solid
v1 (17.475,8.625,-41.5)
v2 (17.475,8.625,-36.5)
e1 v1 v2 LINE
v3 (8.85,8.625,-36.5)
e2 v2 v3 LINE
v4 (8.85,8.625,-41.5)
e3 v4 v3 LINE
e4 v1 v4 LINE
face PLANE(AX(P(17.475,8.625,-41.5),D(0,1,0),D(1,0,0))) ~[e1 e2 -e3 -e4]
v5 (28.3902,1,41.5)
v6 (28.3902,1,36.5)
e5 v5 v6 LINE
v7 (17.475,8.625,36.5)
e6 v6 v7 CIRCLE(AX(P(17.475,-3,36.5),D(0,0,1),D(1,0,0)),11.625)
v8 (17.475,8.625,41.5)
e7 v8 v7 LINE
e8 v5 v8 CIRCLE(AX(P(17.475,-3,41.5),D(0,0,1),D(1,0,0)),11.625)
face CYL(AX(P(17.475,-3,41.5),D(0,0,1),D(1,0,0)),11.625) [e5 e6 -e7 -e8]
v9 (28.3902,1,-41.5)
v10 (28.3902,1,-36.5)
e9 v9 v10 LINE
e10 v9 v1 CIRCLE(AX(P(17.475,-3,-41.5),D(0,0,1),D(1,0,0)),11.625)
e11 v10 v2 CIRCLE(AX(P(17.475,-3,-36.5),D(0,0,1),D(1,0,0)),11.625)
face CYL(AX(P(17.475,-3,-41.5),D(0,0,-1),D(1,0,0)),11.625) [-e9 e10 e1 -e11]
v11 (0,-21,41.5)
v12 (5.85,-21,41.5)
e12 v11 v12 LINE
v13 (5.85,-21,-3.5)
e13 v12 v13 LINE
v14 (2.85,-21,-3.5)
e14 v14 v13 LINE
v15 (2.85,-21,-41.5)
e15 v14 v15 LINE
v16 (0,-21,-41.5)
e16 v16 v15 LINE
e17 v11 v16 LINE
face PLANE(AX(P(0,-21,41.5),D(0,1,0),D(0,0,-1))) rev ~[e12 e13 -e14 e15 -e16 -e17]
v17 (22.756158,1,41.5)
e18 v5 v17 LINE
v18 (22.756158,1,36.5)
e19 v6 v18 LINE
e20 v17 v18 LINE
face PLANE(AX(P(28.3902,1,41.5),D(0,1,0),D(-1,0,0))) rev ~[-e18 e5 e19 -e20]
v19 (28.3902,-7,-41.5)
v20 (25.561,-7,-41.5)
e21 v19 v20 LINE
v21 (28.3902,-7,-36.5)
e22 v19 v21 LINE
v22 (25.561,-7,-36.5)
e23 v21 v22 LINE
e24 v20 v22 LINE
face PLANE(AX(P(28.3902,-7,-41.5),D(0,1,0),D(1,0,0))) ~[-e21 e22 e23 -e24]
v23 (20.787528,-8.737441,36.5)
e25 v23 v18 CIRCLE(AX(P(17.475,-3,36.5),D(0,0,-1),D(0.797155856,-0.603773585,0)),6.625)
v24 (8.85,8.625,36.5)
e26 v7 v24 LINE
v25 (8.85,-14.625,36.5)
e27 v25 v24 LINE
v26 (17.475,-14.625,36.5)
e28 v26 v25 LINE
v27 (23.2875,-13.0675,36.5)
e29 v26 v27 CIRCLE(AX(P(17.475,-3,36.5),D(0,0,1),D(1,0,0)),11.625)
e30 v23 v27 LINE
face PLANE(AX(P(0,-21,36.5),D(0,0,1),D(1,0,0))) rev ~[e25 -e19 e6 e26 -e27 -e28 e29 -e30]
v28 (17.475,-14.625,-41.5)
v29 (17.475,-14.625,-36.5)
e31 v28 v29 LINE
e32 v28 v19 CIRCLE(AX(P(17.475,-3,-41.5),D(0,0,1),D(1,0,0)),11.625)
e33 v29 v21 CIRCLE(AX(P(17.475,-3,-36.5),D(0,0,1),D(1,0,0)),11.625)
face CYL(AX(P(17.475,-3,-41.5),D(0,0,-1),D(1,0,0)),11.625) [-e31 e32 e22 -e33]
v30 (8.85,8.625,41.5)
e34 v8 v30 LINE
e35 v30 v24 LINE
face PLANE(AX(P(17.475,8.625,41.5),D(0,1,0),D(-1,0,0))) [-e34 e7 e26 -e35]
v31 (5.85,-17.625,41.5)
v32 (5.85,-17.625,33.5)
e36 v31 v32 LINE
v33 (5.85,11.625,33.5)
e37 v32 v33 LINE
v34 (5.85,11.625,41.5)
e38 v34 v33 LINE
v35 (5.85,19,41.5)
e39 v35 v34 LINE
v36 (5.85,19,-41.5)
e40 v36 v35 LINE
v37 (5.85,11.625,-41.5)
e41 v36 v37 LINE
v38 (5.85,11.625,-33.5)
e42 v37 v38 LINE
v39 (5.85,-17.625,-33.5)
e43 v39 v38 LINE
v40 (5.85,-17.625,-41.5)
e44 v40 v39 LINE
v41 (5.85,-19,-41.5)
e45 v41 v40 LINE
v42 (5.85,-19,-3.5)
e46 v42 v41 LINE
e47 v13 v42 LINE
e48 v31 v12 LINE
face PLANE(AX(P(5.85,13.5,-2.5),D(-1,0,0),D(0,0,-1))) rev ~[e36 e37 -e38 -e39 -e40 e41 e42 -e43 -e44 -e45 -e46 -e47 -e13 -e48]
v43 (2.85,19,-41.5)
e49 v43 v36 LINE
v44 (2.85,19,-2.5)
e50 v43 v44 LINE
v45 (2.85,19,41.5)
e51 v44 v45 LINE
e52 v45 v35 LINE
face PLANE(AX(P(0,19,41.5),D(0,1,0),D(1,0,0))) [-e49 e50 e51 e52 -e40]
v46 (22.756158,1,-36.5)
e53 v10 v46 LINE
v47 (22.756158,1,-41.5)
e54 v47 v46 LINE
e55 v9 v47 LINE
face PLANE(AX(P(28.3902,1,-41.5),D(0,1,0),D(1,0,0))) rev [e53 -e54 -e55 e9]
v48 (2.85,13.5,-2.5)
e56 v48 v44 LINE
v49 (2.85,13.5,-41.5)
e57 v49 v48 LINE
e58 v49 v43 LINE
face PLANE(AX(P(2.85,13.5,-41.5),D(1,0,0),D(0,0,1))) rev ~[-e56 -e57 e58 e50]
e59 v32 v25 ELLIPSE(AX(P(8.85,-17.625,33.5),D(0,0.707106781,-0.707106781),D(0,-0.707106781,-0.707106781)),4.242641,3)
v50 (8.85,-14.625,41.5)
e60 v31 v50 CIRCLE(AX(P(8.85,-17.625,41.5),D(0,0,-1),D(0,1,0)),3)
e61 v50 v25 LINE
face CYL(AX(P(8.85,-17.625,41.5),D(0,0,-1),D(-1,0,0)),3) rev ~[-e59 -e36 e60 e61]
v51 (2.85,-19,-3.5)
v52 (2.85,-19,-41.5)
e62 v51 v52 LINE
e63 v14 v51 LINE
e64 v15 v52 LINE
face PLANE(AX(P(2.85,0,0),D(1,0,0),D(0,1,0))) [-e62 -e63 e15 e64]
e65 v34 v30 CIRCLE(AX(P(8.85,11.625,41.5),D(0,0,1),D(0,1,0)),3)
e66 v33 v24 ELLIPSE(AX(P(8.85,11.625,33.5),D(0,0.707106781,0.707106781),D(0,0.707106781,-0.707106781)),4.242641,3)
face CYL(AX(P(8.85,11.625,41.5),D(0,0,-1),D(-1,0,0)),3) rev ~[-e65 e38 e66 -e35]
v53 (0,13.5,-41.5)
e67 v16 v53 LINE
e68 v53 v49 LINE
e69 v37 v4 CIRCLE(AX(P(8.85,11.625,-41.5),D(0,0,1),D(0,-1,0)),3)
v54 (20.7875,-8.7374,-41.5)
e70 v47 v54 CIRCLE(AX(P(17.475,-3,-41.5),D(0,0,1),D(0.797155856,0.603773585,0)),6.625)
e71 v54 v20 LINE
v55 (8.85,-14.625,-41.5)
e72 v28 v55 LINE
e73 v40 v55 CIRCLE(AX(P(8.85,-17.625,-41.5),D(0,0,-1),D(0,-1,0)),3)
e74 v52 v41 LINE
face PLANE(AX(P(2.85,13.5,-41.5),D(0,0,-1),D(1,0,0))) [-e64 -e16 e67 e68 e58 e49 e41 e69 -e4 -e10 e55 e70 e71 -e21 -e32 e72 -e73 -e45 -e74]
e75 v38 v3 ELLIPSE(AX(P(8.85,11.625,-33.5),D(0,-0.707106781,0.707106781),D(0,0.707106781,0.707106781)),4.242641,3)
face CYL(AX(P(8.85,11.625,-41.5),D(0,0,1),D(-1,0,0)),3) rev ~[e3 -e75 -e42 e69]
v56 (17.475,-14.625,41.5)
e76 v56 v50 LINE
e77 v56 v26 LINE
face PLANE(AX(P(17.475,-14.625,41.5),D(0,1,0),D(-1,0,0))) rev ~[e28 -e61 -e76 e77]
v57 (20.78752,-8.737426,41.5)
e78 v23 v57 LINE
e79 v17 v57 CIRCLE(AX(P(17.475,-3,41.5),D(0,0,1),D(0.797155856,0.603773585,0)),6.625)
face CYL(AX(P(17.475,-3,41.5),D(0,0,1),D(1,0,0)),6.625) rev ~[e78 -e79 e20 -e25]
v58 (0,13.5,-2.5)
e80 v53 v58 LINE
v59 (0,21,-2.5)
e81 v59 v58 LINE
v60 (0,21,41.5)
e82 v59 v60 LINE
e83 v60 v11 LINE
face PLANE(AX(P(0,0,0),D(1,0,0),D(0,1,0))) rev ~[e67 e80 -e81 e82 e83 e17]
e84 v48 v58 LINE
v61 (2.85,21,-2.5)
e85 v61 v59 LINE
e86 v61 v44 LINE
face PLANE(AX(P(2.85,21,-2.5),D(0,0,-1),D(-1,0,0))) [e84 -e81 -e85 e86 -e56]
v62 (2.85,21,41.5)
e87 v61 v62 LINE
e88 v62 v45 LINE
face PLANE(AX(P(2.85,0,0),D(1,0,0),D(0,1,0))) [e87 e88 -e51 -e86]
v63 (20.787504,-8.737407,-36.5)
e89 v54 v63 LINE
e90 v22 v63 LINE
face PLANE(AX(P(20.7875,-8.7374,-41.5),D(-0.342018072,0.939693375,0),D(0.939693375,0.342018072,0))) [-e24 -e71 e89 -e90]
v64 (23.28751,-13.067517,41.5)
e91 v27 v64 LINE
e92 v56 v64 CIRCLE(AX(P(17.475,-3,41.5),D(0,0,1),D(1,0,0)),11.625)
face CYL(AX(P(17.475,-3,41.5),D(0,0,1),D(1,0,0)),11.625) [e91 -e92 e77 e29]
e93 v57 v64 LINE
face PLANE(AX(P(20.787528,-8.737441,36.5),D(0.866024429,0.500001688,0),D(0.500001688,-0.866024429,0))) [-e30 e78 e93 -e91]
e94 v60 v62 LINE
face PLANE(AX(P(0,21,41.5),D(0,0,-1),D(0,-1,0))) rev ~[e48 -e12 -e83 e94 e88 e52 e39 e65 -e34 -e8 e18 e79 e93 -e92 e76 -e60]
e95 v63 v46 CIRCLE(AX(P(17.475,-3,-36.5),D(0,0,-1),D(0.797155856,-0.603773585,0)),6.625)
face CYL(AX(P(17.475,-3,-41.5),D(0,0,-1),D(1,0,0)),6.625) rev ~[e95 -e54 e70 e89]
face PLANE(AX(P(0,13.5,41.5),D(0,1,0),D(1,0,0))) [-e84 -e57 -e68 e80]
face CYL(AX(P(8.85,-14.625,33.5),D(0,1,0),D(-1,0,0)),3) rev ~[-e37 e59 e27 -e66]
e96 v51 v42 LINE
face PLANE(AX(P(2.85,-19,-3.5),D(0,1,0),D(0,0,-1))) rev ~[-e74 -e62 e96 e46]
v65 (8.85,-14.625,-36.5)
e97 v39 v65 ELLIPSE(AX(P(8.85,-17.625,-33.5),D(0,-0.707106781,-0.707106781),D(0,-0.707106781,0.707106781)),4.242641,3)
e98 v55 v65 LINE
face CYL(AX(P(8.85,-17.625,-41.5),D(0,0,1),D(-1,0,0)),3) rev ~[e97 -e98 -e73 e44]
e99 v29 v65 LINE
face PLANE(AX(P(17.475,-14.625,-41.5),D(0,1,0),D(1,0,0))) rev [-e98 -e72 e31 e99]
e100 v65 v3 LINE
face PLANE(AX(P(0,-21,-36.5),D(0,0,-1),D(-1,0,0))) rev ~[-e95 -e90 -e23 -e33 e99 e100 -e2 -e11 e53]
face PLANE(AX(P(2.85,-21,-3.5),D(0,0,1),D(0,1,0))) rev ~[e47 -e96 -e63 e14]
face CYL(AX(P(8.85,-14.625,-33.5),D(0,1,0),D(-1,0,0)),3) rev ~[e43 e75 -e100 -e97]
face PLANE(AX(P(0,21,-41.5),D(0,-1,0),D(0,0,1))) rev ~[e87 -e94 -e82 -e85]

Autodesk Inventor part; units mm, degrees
ref_plane "YZ Plane" through (0, 0, 0) normal (1, 0, 0) x (0, 1, 0)
ref_plane "XZ Plane" through (0, 0, 0) normal (0, 1, 0) x (-1, 0, 0)
sketch "Sketch1" plane through (0, 0, 0) normal (1, 0, 0) x (0, 1, 0)
  line L0 (21, 41.5) -> (-21, 41.5)
  line L1 (-21, 41.5) -> (-21, -41.5)
  line L2 (-21, -41.5) -> (21, -41.5)
  line L3 (21, -41.5) -> (21, 41.5)
  point P0 (0, 0)
  dimension "d0" = 83
  dimension "d1" = 41.5
  dimension "d2" = 42
  dimension "d3" = 21
extrude "Extrusion1" add sketch "Sketch1" along normal blind 2.85
sketch "Sketch3" plane through (2.85, 0, 0) normal (1, 0, 0) x (0, 0, -1)
  line L0 (41.5, 21) -> (-41.5, 21) projected
  line L1 (-41.5, 21) -> (2.5, 21)
  line L2 (2.5, 21) -> (2.5, 19)
  line L3 (2.5, 19) -> (-41.5, 19)
  line L4 (-41.5, 19) -> (-41.5, 21)
  line L5 (-41.5, -21) -> (41.5, -21) projected
  line L6 (41.5, -21) -> (3.5, -21)
  line L7 (3.5, -21) -> (3.5, -19)
  line L8 (3.5, -19) -> (41.5, -19)
  line L9 (41.5, -19) -> (41.5, -21)
  line L10 (41.5, -21) -> (41.5, 21) projected
  line L11 (41.5, 21) -> (-41.5, 21) projected
  line L12 (-41.5, 21) -> (-41.5, -21) projected
  line L13 (-41.5, -21) -> (41.5, -21) projected
  point P0 (0, 0)
  point P1 (41.5, 21)
  dimension "d12" = 44
  dimension "d13" = 2
  dimension "d14" = 38
  dimension "d15" = 2
extrude "Extrusion3" add sketch "Sketch3" along normal blind 3 contours L10 L8 L7 L5 L12 L3 L2 L0
sketch "Sketch4" plane through (0, 21, 41.5) normal (0, 1, 0) x (1, 0, 0)
  line L0 (0, 83) -> (0, 0) projected
  line L1 (2.85, 44) -> (5.85, 44) projected
  line L2 (0, 83) -> (5.85, 83)
  line L3 (5.85, 83) -> (5.85, 44)
  line L4 (5.85, 44) -> (0, 44)
  line L5 (0, 44) -> (0, 83)
  point P0 (0, 41.5)
extrude "Extrusion4" cut sketch "Sketch4" against normal blind 7.5
sketch "Sketch5" plane through (0, -21, 41.5) normal (0, 0, 1) x (1, 0, 0)
  circle A0 centre (17.475, 18) radius 6.625
  circle A1 centre (17.475, 18) radius 11.625
  line L0 (5.85, 40) -> (5.85, 0) projected
  line L1 (5.85, 2) -> (5.85, 34.5) projected
  line L2 (2.85, 40) -> (5.85, 40) projected
  line L3 (17.475, 6.375) -> (5.85, 6.375)
  line L4 (28.3902, 22) -> (12.1938, 22)
  line L5 (28.3902, 14) -> (12.1938, 14)
  line L6 (17.475, 29.625) -> (5.85, 29.625)
  line L7 (17.475, 18) -> (5.85, 18)
  line L8 (0, 0) -> (5.85, 0) projected
  point P0 (0, 21)
  point P1 (22.7562, 14)
  point P2 (22.7562, 22)
  dimension "d20" = 13.25
  dimension "d21" = 5
  dimension "d30" = 18
  dimension "d31" = 4
  dimension "d32" = 4
extrude "Extrusion5" add sketch "Sketch5" against normal blind 5 contours A0 L7 A1 L4 | L5 A1 L7 A0 | A1 L0 L6 | L3 L0 A1
fillet "Fillet3" radius 3 3 edges at (5.85, -14.625, 39) (5.85, -3, 36.5) (5.85, 8.625, 39)
ref_plane "Work Plane1" through (2.85, -21, 0) normal (0, 0, -1) x (-1, 0, 0)
mirror "Mirror1" about plane through (2.85, -21, 0) normal (0, 0, -1) of "Extrusion5", "Fillet3"
sketch "Sketch6" plane through (0, -21, 36.5) normal (0, 0, -1) x (-1, 0, 0)
  line L0 (-8.85, 29.625) -> (-8.85, 6.375) projected
  line L1 (-8.85, 29.625) -> (-17.475, 29.625) projected
  arc A0 (-17.475, 29.625) -> (-28.3902, 22) centre (-17.475, 18) ccw projected
  line L2 (-28.3902, 22) -> (-22.7562, 22) projected
  arc A1 (-22.7562, 14) -> (-22.7562, 22) centre (-17.475, 18) ccw projected
  line L3 (-22.7562, 14) -> (-28.3902, 14) projected
  arc A2 (-28.3902, 14) -> (-17.475, 6.375) centre (-17.475, 18) ccw projected
  line L4 (-17.475, 6.375) -> (-8.85, 6.375) projected
  line L5 (-17.475, 18) -> (-23.2875, 28.0675)
  arc A3 (-17.475, 29.625) -> (-28.3902, 22) centre (-17.475, 18) ccw projected
  line L6 (-17.475, 18) -> (-5.85, 18) construction
  line L7 (-17.475, 18) -> (-23.2875, 7.9325)
  arc A4 (-28.3902, 14) -> (-17.475, 6.375) centre (-17.475, 18) ccw projected
  line L8 (-17.475, 18) -> (-5.85, 18) construction
  point P0 (0, 21)
  point P1 (-20.7875, 23.7374)
  point P2 (-20.7875, 12.2626)
  dimension "d33" = 120
  dimension "d42" = 120
extrude "Extrusion6" cut sketch "Sketch6" against normal blind 13.5 contours A2 L3 A1 L7
sketch "Sketch7" plane through (2.85, -21, -41.5) normal (0, 0, -1) x (-1, 0, 0)
  line L0 (2.85, 34.5) -> (-3, 34.5) projected
  line L1 (-3, 32.625) -> (-3, 34.5) projected
  arc A0 (-6, 29.625) -> (-3, 32.625) centre (-6, 32.625) ccw projected
  line L2 (-14.625, 29.625) -> (-6, 29.625) projected
  arc A1 (-14.625, 29.625) -> (-25.5402, 22) centre (-14.625, 18) ccw projected
  line L3 (-19.9062, 22) -> (-25.5402, 22) projected
  arc A2 (-19.9062, 14) -> (-19.9062, 22) centre (-14.625, 18) ccw projected
  line L4 (-25.5402, 14) -> (-19.9062, 14) projected
  arc A3 (-25.5402, 14) -> (-14.625, 6.375) centre (-14.625, 18) ccw projected
  line L5 (-6, 6.375) -> (-14.625, 6.375) projected
  arc A4 (-3, 3.375) -> (-6, 6.375) centre (-6, 3.375) ccw projected
  line L6 (-3, 2) -> (-3, 3.375) projected
  line L7 (0, 2) -> (-3, 2) projected
  line L8 (0, 0) -> (0, 2) projected
  line L9 (2.85, 0) -> (0, 0) projected
  line L10 (2.85, 0) -> (2.85, 34.5) projected
  arc A5 (-14.625, 29.625) -> (-25.5402, 22) centre (-14.625, 18) ccw projected
  line L11 (-19.9062, 22) -> (-25.5402, 22) projected
  line L12 (-14.625, 18) -> (-20.4375, 7.9325)
  arc A6 (-25.5402, 14) -> (-14.625, 6.375) centre (-14.625, 18) ccw projected
  line L13 (-14.625, 18) -> (-3, 18) construction
  line L14 (-25.5402, 14) -> (-19.9062, 14) projected
  arc A7 (-19.9062, 14) -> (-19.9062, 22) centre (-14.625, 18) ccw projected
  line L15 (-17.9375, 12.2626) -> (-22.711, 14)
  line L16 (-17.9375, 12.2626) -> (-12.8576, 12.2626) construction
  point P0 (2.85, 21)
  dimension "d43" = 120
  dimension "d44" = 160
extrude "Extrusion7" cut sketch "Sketch7" against normal blind 11.5 contours L15 L4 A2
sketch "Sketch8" plane through (0, 13.5, 41.5) normal (0, 1, 0) x (1, 0, 0)
  line L0 (2.85, 44) -> (0, 44) projected
  line L1 (0, 83) -> (5.85, 83) projected
  line L2 (2.85, 44) -> (5.85, 44)
  line L3 (5.85, 44) -> (5.85, 83)
  line L4 (5.85, 83) -> (2.85, 83)
  line L5 (2.85, 83) -> (2.85, 44)
  point P0 (0, 41.5)
extrude "Extrusion8" add sketch "Sketch8" along normal up to surface (5.5 mm away)
equation "\"d1\" = 0.5 * d0"
equation "\"d3\" = 0.5 * d2"
equation "\"d32\" = d31"
properties part number "Lid"
